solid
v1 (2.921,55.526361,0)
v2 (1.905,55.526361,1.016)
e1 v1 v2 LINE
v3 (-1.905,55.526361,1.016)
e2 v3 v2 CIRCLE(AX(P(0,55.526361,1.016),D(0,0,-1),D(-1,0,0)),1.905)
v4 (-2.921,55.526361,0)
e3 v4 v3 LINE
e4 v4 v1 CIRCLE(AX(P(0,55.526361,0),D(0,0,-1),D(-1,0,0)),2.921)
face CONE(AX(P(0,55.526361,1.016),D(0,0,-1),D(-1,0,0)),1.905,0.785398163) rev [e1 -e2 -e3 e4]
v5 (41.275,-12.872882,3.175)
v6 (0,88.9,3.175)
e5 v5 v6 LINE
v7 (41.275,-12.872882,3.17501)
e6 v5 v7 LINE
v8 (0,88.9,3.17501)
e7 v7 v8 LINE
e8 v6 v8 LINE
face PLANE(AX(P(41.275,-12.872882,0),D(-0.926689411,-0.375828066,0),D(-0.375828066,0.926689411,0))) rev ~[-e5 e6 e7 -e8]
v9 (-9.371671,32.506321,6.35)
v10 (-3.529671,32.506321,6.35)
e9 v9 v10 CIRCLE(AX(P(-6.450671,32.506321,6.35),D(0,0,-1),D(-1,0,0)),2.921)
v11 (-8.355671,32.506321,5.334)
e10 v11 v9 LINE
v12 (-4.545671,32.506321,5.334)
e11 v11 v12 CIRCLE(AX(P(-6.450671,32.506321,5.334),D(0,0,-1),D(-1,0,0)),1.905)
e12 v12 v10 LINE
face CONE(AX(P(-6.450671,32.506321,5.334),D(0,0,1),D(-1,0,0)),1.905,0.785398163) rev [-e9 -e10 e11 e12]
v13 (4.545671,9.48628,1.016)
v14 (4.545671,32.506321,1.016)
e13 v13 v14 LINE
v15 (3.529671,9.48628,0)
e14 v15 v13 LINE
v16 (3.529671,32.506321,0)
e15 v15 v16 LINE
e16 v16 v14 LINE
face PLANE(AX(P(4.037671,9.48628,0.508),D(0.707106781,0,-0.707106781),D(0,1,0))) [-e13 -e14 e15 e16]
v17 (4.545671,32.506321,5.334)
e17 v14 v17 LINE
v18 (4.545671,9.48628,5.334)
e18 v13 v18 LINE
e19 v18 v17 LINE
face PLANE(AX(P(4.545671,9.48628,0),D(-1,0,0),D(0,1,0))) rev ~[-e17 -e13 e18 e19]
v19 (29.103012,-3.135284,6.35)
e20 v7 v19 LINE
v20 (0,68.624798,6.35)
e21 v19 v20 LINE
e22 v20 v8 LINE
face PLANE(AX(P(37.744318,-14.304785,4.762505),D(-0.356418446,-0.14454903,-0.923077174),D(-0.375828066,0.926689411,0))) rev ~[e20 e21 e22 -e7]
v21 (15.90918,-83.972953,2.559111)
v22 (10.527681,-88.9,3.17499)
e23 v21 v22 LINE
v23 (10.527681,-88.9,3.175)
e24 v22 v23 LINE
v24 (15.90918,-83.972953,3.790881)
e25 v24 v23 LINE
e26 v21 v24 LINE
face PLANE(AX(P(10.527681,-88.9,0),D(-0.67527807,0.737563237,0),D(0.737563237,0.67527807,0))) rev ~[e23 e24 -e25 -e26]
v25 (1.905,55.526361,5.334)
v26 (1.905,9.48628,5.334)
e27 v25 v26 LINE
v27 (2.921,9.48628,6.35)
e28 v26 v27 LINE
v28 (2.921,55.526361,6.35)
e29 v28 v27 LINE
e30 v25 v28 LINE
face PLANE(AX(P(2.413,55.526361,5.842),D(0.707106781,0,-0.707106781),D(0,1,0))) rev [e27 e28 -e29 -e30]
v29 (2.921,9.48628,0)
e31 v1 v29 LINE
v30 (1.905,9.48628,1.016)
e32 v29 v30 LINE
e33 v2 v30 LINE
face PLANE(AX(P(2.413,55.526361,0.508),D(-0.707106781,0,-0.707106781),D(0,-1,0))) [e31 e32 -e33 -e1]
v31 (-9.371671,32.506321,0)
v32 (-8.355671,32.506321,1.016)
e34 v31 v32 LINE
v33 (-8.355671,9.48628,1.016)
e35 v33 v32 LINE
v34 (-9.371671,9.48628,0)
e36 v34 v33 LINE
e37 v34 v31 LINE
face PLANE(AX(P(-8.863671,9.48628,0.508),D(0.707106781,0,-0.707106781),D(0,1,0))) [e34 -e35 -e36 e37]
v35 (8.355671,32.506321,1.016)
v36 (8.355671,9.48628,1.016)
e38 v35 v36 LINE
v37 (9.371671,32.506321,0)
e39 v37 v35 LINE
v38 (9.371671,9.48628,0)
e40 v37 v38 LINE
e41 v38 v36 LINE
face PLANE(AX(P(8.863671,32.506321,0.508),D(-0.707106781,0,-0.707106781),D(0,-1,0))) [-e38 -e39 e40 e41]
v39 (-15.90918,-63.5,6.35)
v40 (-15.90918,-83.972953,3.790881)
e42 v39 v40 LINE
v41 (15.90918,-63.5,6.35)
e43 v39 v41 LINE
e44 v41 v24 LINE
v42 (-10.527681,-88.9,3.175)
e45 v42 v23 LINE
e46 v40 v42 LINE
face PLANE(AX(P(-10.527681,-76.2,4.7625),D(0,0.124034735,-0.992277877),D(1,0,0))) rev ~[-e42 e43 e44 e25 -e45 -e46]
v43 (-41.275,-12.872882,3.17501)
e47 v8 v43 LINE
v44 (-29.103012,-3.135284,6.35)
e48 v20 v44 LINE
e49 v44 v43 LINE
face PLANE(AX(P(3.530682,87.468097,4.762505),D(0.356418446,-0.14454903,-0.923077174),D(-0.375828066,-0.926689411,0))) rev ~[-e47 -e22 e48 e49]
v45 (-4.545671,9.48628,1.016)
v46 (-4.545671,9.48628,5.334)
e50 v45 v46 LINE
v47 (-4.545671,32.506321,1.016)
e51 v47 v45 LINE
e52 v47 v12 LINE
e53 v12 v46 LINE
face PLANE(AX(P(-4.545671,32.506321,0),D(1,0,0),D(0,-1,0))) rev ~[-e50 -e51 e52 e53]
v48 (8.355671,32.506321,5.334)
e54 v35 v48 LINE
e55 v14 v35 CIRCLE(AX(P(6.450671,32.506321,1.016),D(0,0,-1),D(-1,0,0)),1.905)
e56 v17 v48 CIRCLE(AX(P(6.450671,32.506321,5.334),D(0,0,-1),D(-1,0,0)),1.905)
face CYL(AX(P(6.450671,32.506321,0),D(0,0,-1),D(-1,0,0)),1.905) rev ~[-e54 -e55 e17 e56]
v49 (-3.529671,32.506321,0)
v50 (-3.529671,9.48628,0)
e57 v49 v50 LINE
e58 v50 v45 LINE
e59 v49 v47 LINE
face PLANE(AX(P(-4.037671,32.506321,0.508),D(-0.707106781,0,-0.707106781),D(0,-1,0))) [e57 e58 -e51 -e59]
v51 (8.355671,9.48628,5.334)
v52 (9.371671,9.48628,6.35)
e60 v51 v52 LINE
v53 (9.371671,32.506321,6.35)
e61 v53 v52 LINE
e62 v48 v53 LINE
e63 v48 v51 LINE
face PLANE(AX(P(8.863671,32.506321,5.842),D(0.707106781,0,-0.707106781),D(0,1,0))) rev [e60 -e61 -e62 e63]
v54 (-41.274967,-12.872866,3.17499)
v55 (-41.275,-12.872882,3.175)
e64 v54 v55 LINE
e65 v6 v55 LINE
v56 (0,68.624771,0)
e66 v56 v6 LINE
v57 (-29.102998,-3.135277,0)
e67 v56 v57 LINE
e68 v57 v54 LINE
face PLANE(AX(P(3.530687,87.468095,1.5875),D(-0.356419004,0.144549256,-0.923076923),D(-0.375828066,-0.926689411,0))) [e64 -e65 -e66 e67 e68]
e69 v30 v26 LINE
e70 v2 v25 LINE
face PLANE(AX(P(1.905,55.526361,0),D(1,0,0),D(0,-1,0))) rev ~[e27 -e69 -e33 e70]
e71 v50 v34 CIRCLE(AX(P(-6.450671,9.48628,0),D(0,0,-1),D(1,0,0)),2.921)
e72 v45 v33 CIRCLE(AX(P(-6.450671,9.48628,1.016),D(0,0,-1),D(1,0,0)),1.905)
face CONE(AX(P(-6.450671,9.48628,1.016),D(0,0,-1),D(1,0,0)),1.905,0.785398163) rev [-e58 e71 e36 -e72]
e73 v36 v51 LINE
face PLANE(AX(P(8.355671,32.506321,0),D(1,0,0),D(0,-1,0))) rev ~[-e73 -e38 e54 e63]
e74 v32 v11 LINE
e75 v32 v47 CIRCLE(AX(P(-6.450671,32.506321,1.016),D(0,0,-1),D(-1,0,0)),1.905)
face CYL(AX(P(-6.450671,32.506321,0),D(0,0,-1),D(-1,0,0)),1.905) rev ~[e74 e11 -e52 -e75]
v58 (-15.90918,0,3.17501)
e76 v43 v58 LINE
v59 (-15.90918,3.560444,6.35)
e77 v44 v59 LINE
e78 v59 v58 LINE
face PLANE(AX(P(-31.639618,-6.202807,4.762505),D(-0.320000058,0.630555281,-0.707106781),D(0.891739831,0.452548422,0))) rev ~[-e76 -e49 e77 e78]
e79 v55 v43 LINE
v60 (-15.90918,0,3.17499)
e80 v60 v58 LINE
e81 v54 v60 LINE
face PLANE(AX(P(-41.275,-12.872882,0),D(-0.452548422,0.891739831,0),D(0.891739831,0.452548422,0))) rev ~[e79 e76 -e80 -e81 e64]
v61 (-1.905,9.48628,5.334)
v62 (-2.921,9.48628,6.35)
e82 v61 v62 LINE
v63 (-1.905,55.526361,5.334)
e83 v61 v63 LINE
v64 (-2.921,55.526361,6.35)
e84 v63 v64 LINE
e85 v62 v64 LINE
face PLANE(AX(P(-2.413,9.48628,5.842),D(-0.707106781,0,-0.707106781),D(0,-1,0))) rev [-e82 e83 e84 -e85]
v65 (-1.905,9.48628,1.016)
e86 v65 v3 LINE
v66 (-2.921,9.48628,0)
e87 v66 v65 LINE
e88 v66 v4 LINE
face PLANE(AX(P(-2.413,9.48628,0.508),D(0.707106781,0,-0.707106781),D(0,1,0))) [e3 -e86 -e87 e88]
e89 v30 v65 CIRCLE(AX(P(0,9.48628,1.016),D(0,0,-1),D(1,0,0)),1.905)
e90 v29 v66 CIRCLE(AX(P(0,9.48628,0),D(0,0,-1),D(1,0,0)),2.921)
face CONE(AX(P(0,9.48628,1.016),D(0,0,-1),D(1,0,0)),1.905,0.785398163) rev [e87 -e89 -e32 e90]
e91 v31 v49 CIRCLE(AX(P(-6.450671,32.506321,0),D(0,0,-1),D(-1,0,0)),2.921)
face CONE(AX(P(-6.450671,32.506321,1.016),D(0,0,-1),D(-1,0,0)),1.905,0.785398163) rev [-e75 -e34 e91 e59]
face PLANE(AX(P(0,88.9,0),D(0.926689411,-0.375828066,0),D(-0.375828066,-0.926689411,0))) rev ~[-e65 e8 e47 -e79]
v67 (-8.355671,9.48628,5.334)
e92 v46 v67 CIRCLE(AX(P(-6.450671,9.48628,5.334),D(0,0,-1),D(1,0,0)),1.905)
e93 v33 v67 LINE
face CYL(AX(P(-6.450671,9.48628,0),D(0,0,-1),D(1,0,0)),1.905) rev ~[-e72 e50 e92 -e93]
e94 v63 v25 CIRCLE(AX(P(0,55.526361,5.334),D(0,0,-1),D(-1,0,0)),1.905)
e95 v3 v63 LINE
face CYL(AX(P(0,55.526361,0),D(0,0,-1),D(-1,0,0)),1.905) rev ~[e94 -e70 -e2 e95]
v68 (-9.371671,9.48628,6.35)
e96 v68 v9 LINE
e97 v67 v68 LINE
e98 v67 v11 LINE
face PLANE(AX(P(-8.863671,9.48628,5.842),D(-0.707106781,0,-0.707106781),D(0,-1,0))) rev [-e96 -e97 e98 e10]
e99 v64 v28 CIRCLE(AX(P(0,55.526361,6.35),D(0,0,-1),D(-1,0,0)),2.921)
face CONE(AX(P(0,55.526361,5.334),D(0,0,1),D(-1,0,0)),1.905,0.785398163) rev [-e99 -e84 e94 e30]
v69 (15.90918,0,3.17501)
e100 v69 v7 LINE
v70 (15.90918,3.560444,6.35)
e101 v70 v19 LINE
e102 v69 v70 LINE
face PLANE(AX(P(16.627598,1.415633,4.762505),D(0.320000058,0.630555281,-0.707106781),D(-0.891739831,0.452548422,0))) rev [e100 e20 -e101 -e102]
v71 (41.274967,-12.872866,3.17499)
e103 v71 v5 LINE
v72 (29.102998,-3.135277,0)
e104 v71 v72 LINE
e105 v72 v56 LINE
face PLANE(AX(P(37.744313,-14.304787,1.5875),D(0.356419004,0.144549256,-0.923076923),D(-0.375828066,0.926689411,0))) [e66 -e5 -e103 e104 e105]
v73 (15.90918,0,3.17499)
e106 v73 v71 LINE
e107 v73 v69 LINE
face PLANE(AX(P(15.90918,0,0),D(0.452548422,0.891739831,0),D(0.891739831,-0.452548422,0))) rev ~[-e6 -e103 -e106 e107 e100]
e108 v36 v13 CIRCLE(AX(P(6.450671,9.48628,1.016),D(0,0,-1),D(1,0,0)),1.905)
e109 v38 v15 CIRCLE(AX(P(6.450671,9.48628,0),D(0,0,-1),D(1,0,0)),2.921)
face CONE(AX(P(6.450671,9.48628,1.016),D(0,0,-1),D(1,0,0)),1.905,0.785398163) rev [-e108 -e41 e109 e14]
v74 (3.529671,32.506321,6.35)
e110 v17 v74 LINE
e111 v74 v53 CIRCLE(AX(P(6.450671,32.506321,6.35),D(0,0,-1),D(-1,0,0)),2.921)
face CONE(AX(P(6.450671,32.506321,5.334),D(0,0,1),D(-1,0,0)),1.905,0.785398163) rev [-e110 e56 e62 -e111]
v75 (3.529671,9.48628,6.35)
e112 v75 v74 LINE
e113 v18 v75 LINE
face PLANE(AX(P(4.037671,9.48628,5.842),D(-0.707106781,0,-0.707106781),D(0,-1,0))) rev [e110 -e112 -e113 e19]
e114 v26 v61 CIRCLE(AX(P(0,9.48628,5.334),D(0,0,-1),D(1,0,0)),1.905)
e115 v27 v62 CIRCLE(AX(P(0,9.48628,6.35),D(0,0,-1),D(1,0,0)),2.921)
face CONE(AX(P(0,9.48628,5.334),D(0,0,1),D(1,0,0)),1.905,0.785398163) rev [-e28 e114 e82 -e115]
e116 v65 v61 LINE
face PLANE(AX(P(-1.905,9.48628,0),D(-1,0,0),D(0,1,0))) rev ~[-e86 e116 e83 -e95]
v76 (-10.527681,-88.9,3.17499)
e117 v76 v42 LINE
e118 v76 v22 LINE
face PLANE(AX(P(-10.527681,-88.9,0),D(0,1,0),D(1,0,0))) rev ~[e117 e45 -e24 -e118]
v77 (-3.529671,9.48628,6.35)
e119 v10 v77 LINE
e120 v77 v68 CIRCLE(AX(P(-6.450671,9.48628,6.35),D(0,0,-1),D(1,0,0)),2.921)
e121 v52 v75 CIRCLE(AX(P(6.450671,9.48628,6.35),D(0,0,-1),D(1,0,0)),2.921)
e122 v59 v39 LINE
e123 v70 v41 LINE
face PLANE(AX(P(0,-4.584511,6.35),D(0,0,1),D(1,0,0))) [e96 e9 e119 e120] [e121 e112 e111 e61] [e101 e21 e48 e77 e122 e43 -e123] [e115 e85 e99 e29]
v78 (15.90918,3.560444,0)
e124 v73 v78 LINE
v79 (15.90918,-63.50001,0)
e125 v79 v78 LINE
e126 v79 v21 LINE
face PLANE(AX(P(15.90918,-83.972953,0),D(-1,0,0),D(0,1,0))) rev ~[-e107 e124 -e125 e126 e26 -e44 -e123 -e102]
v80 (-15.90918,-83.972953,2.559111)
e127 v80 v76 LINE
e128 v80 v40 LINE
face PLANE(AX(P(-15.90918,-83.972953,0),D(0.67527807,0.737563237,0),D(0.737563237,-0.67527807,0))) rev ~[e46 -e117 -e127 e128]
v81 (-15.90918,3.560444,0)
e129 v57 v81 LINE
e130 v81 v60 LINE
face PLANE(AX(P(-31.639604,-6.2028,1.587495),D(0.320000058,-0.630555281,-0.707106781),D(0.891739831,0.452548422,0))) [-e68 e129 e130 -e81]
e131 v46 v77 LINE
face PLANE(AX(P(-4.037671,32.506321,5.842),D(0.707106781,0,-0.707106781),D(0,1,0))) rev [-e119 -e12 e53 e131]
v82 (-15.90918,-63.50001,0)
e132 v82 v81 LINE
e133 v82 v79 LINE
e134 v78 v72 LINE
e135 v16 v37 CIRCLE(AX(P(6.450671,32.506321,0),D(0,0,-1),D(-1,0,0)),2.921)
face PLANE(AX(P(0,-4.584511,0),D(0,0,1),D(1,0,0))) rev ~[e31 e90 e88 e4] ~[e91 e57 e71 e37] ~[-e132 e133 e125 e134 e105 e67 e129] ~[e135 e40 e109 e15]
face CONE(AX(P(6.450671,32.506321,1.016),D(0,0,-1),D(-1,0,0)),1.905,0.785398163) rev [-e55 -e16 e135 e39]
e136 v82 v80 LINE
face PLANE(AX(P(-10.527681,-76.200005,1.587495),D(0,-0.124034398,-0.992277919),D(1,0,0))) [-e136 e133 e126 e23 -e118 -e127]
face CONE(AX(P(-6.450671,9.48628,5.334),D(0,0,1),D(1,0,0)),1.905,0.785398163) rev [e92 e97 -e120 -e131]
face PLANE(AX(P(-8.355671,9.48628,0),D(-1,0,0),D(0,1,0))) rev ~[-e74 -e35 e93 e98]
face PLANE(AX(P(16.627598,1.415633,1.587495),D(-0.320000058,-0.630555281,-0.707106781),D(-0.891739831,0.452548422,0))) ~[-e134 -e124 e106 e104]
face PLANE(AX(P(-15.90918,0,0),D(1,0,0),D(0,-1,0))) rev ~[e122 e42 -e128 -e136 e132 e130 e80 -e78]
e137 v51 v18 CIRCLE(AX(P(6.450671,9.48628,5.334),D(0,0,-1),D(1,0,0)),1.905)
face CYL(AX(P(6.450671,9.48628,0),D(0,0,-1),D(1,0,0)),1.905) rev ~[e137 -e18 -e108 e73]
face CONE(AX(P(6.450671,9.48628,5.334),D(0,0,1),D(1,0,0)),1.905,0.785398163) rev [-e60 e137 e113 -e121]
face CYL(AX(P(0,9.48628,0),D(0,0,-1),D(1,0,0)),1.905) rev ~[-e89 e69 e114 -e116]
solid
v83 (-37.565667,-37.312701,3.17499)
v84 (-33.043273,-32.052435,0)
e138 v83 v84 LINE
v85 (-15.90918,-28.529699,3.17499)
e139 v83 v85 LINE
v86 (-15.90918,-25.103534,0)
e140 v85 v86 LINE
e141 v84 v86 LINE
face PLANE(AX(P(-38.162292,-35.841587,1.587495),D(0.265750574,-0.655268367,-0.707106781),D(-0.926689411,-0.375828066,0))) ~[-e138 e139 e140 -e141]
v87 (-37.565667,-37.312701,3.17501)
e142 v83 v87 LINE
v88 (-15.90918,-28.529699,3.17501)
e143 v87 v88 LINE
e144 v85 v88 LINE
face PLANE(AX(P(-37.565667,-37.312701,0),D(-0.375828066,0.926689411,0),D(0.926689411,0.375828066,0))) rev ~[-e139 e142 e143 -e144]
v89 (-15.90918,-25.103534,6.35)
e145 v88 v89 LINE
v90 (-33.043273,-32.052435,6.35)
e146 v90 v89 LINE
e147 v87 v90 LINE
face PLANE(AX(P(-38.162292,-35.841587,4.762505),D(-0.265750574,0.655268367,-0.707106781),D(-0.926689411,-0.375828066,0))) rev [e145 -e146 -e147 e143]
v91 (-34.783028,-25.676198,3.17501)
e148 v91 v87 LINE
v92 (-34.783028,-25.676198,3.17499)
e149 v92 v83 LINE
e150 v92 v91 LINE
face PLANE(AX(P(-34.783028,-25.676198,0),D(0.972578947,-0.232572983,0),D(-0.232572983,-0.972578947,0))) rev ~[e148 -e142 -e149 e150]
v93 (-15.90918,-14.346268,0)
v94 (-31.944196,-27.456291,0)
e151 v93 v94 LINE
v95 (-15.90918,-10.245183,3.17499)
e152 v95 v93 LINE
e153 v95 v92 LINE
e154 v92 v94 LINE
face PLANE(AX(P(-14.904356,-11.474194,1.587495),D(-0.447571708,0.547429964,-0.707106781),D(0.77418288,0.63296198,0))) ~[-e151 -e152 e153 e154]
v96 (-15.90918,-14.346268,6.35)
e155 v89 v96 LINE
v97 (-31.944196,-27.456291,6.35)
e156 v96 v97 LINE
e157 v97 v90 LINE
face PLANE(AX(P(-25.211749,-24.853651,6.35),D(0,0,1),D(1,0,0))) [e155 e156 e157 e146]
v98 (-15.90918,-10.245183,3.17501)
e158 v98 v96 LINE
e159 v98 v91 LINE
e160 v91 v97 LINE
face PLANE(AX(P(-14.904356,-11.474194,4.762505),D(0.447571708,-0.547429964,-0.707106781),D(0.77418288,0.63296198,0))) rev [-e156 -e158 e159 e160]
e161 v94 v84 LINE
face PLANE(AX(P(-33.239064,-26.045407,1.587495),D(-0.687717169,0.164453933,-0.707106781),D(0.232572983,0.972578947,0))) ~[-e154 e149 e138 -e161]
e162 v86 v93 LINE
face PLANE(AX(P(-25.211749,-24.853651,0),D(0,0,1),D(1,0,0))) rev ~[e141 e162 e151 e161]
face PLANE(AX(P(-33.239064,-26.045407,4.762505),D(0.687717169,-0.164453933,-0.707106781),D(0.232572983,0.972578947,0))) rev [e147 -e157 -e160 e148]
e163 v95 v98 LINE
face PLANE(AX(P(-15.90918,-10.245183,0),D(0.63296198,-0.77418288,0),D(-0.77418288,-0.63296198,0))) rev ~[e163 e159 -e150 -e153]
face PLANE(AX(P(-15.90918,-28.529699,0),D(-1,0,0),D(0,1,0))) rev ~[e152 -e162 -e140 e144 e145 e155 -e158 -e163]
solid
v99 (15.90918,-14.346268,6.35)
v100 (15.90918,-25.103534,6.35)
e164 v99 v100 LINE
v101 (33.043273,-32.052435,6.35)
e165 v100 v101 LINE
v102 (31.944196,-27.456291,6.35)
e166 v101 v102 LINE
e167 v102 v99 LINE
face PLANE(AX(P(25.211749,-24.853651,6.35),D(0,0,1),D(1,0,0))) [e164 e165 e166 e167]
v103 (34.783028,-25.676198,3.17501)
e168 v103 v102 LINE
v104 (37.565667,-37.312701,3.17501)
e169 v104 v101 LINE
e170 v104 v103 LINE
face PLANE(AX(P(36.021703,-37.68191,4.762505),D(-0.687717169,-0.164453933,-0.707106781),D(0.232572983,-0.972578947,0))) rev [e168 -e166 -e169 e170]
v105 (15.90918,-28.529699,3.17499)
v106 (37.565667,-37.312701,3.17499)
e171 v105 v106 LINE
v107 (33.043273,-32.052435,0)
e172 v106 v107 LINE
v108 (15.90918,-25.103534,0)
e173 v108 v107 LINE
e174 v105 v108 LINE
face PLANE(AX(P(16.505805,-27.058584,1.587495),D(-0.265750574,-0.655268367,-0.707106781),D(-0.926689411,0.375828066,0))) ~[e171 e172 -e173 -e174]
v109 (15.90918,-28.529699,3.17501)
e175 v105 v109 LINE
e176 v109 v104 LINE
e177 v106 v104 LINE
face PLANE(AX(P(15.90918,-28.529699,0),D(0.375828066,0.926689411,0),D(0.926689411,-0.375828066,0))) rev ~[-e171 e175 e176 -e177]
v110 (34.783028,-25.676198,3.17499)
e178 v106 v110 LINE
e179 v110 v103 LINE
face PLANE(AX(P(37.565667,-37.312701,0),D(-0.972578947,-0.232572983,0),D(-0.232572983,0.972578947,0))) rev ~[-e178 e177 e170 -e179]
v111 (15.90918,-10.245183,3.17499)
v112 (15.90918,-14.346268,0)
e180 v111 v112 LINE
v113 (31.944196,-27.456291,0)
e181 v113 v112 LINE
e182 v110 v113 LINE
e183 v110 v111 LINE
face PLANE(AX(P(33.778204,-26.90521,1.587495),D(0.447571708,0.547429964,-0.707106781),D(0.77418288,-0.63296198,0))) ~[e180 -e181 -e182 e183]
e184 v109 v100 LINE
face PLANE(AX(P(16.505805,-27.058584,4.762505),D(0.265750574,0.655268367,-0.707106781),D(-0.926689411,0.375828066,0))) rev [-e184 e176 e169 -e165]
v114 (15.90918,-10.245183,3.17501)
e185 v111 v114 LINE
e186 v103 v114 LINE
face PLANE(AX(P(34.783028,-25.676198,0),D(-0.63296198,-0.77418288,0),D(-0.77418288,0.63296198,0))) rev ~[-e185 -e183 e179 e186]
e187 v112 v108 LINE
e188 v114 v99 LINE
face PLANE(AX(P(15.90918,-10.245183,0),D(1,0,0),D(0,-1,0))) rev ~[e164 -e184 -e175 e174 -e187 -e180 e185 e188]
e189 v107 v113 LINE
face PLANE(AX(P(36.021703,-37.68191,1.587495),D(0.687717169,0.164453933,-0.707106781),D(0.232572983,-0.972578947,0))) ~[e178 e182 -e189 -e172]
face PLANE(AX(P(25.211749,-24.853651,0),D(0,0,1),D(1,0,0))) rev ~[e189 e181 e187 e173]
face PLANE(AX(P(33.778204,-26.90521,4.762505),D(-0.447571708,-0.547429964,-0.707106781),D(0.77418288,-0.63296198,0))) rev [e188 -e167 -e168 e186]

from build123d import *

# Parameters (mm, degrees)
F1_DEPTH   = 6.35
F2_DEPTH   = 6.35
F3_DEPTH   = 6.35
F4_SIZE2   = 3.175
F4_SIZE    = 7.62
F4_2_SIZE2 = 3.17499
F4_2_SIZE  = 7.61999
F5_SIZE2   = 3.17499
F5_SIZE    = 3.17499
F6_SIZE2   = 3.17499
F6_SIZE    = 3.17499
F6_2_SIZE2 = 3.17499
F6_2_SIZE  = 3.17499
F7_SIZE    = 1.016
F8_SIZE2   = 3.175
F8_SIZE    = 25.4
F8_2_SIZE2 = 3.17499
F8_2_SIZE  = 25.39999


# Not quite as in the source:
# - a fillet or chamfer is up to 0.001 mm smaller than in the source, because OpenCascade refuses the exact size


with BuildPart() as f1:
    # F0 (on Top) → F1 (new body)
    with BuildSketch(Plane.XY):
        Polygon((41.275, -12.8728821874), (0, 88.9), (-41.275, -12.8728821874), (-15.9091800451, 0), (-15.9091800451, -10.2451825514), (-15.9091800451, -28.5296985704), (-15.9091800451, -83.9729532599), (-10.527680628, -88.9), (10.527680628, -88.9), (15.9091800451, -83.9729532599), (15.9091800451, -28.5296985704), (15.9091800451, -10.2451825514), (15.9091800451, 0), align=None)
        with BuildLine():
            Line((-8.355671237, 9.4862803817), (-8.355671237, 32.5063206255))
            ThreePointArc((-8.355671237, 32.5063206255), (-6.450671237, 34.4113206255), (-4.545671237, 32.5063206255))
            Line((-4.545671237, 32.5063206255), (-4.545671237, 9.4862803817))
            ThreePointArc((-4.545671237, 9.4862803817), (-6.450671237, 7.5812803817), (-8.355671237, 9.4862803817))
        make_face(mode=Mode.SUBTRACT)
        with BuildLine():
            Line((4.545671237, 9.4862803817), (4.545671237, 32.5063206255))
            ThreePointArc((4.545671237, 32.5063206255), (6.450671237, 34.4113206255), (8.355671237, 32.5063206255))
            Line((8.355671237, 32.5063206255), (8.355671237, 9.4862803817))
            ThreePointArc((8.355671237, 9.4862803817), (6.450671237, 7.5812803817), (4.545671237, 9.4862803817))
        make_face(mode=Mode.SUBTRACT)
        with BuildLine():
            Line((-1.905, 9.4862803817), (-1.905, 55.5263608694))
            ThreePointArc((-1.905, 55.5263608694), (0, 57.4313608694), (1.905, 55.5263608694))
            Line((1.905, 55.5263608694), (1.905, 9.4862803817))
            ThreePointArc((1.905, 9.4862803817), (0, 7.5812803817), (-1.905, 9.4862803817))
        make_face(mode=Mode.SUBTRACT)
    extrude(amount=F1_DEPTH)

    # F4
    f4_edges = [f1.edges().sort_by_distance(p)[0] for p in [
        (-20.6375, 38.013559, 0),
        (20.6375, 38.013559, 0),
    ]]
    f4_side = f1.faces().sort_by_distance((0, -6.764351, 0))[0]
    chamfer(f4_edges, length=F4_SIZE, length2=F4_SIZE2, reference=f4_side)

    # F4#2 (size 7.62 and 3.175 in the source; OpenCascade refuses exactly that, so slightly less here)
    f4_2_edges = [f1.edges().sort_by_distance(p)[0] for p in [
        (20.6375, 38.013559, 6.35),
        (-20.6375, 38.013559, 6.35),
    ]]
    f4_2_side = f1.faces().sort_by_distance((0, -6.764351, 6.35))[0]
    chamfer(f4_2_edges, length=F4_2_SIZE, length2=F4_2_SIZE2, reference=f4_2_side)

    # F5 (size 3.175 and 3.175 in the source; OpenCascade refuses exactly that, so slightly less here)
    f5_edges = [f1.edges().sort_by_distance(p)[0] for p in [
        (23.41519, -3.80922, 6.35),
        (23.415183, -3.809216, 0),
        (-23.41519, -3.80922, 6.35),
        (-23.415183, -3.809216, 0),
    ]]
    chamfer(f5_edges, length=F5_SIZE, length2=F5_SIZE2)

    # F7
    f7_edges = [f1.edges().sort_by_distance(p)[0] for p in [
        (-8.355671, 20.996301, 6.35),
        (-6.450671, 7.58128, 6.35),
        (-4.545671, 20.996301, 6.35),
        (-6.450671, 34.411321, 6.35),
        (-1.905, 32.506321, 6.35),
        (0, 7.58128, 6.35),
        (1.905, 32.506321, 6.35),
        (0, 57.431361, 6.35),
        (8.355671, 20.996301, 6.35),
        (6.450671, 34.411321, 6.35),
        (4.545671, 20.996301, 6.35),
        (6.450671, 7.58128, 6.35),
        (-6.450671, 7.58128, 0),
        (0, 7.58128, 0),
        (6.450671, 7.58128, 0),
        (4.545671, 20.996301, 0),
        (8.355671, 20.996301, 0),
        (-1.905, 32.506321, 0),
        (1.905, 32.506321, 0),
        (-4.545671, 20.996301, 0),
        (-8.355671, 20.996301, 0),
        (6.450671, 34.411321, 0),
        (-6.450671, 34.411321, 0),
        (0, 57.431361, 0),
    ]]
    chamfer(f7_edges, length=F7_SIZE)

    # F8
    f8_edges = [f1.edges().sort_by_distance(p)[0] for p in [
        (0, -88.9, 6.35),
    ]]
    f8_side = f1.faces().sort_by_distance((0, -23.545695, 6.35))[0]
    chamfer(f8_edges, length=F8_SIZE, length2=F8_SIZE2, reference=f8_side)

    # F8#2 (size 25.4 and 3.175 in the source; OpenCascade refuses exactly that, so slightly less here)
    f8_2_edges = [f1.edges().sort_by_distance(p)[0] for p in [
        (0, -88.9, 0),
    ]]
    f8_2_side = f1.faces().sort_by_distance((0, -23.545717, 0))[0]
    chamfer(f8_2_edges, length=F8_2_SIZE, length2=F8_2_SIZE2, reference=f8_2_side)


with BuildPart() as f2:
    # F0 (on Top) → F2 (new body)
    with BuildSketch(Plane.XY):
        Polygon((-15.9091800451, -28.5296985704), (-15.9091800451, -10.2451825514), (-34.7830280662, -25.6761983037), (-37.5656671822, -37.3127013445), align=None)
    extrude(amount=F2_DEPTH)

    # F6 (size 3.175 and 3.175 in the source; OpenCascade refuses exactly that, so slightly less here)
    f6_edges = [f2.edges().sort_by_distance(p)[0] for p in [
        (-25.346104, -17.96069, 6.35),
        (-25.346104, -17.96069, 0),
        (-36.174348, -31.49445, 6.35),
        (-36.174348, -31.49445, 0),
        (-26.737424, -32.9212, 0),
        (-26.737424, -32.9212, 6.35),
    ]]
    chamfer(f6_edges, length=F6_SIZE, length2=F6_SIZE2)


with BuildPart() as f3:
    # F0 (on Top) → F3 (new body)
    with BuildSketch(Plane.XY):
        Polygon((34.7830280662, -25.6761983037), (15.9091800451, -10.2451825514), (15.9091800451, -28.5296985704), (37.5656671822, -37.3127013445), align=None)
    extrude(amount=F3_DEPTH)

    # F6#2 (size 3.175 and 3.175 in the source; OpenCascade refuses exactly that, so slightly less here)
    f6_2_edges = [f3.edges().sort_by_distance(p)[0] for p in [
        (25.346104, -17.96069, 6.35),
        (25.346104, -17.96069, 0),
        (36.174348, -31.49445, 0),
        (36.174348, -31.49445, 6.35),
        (26.737424, -32.9212, 6.35),
        (26.737424, -32.9212, 0),
    ]]
    chamfer(f6_2_edges, length=F6_2_SIZE, length2=F6_2_SIZE2)


solid = Compound([f1.part, f2.part, f3.part])
